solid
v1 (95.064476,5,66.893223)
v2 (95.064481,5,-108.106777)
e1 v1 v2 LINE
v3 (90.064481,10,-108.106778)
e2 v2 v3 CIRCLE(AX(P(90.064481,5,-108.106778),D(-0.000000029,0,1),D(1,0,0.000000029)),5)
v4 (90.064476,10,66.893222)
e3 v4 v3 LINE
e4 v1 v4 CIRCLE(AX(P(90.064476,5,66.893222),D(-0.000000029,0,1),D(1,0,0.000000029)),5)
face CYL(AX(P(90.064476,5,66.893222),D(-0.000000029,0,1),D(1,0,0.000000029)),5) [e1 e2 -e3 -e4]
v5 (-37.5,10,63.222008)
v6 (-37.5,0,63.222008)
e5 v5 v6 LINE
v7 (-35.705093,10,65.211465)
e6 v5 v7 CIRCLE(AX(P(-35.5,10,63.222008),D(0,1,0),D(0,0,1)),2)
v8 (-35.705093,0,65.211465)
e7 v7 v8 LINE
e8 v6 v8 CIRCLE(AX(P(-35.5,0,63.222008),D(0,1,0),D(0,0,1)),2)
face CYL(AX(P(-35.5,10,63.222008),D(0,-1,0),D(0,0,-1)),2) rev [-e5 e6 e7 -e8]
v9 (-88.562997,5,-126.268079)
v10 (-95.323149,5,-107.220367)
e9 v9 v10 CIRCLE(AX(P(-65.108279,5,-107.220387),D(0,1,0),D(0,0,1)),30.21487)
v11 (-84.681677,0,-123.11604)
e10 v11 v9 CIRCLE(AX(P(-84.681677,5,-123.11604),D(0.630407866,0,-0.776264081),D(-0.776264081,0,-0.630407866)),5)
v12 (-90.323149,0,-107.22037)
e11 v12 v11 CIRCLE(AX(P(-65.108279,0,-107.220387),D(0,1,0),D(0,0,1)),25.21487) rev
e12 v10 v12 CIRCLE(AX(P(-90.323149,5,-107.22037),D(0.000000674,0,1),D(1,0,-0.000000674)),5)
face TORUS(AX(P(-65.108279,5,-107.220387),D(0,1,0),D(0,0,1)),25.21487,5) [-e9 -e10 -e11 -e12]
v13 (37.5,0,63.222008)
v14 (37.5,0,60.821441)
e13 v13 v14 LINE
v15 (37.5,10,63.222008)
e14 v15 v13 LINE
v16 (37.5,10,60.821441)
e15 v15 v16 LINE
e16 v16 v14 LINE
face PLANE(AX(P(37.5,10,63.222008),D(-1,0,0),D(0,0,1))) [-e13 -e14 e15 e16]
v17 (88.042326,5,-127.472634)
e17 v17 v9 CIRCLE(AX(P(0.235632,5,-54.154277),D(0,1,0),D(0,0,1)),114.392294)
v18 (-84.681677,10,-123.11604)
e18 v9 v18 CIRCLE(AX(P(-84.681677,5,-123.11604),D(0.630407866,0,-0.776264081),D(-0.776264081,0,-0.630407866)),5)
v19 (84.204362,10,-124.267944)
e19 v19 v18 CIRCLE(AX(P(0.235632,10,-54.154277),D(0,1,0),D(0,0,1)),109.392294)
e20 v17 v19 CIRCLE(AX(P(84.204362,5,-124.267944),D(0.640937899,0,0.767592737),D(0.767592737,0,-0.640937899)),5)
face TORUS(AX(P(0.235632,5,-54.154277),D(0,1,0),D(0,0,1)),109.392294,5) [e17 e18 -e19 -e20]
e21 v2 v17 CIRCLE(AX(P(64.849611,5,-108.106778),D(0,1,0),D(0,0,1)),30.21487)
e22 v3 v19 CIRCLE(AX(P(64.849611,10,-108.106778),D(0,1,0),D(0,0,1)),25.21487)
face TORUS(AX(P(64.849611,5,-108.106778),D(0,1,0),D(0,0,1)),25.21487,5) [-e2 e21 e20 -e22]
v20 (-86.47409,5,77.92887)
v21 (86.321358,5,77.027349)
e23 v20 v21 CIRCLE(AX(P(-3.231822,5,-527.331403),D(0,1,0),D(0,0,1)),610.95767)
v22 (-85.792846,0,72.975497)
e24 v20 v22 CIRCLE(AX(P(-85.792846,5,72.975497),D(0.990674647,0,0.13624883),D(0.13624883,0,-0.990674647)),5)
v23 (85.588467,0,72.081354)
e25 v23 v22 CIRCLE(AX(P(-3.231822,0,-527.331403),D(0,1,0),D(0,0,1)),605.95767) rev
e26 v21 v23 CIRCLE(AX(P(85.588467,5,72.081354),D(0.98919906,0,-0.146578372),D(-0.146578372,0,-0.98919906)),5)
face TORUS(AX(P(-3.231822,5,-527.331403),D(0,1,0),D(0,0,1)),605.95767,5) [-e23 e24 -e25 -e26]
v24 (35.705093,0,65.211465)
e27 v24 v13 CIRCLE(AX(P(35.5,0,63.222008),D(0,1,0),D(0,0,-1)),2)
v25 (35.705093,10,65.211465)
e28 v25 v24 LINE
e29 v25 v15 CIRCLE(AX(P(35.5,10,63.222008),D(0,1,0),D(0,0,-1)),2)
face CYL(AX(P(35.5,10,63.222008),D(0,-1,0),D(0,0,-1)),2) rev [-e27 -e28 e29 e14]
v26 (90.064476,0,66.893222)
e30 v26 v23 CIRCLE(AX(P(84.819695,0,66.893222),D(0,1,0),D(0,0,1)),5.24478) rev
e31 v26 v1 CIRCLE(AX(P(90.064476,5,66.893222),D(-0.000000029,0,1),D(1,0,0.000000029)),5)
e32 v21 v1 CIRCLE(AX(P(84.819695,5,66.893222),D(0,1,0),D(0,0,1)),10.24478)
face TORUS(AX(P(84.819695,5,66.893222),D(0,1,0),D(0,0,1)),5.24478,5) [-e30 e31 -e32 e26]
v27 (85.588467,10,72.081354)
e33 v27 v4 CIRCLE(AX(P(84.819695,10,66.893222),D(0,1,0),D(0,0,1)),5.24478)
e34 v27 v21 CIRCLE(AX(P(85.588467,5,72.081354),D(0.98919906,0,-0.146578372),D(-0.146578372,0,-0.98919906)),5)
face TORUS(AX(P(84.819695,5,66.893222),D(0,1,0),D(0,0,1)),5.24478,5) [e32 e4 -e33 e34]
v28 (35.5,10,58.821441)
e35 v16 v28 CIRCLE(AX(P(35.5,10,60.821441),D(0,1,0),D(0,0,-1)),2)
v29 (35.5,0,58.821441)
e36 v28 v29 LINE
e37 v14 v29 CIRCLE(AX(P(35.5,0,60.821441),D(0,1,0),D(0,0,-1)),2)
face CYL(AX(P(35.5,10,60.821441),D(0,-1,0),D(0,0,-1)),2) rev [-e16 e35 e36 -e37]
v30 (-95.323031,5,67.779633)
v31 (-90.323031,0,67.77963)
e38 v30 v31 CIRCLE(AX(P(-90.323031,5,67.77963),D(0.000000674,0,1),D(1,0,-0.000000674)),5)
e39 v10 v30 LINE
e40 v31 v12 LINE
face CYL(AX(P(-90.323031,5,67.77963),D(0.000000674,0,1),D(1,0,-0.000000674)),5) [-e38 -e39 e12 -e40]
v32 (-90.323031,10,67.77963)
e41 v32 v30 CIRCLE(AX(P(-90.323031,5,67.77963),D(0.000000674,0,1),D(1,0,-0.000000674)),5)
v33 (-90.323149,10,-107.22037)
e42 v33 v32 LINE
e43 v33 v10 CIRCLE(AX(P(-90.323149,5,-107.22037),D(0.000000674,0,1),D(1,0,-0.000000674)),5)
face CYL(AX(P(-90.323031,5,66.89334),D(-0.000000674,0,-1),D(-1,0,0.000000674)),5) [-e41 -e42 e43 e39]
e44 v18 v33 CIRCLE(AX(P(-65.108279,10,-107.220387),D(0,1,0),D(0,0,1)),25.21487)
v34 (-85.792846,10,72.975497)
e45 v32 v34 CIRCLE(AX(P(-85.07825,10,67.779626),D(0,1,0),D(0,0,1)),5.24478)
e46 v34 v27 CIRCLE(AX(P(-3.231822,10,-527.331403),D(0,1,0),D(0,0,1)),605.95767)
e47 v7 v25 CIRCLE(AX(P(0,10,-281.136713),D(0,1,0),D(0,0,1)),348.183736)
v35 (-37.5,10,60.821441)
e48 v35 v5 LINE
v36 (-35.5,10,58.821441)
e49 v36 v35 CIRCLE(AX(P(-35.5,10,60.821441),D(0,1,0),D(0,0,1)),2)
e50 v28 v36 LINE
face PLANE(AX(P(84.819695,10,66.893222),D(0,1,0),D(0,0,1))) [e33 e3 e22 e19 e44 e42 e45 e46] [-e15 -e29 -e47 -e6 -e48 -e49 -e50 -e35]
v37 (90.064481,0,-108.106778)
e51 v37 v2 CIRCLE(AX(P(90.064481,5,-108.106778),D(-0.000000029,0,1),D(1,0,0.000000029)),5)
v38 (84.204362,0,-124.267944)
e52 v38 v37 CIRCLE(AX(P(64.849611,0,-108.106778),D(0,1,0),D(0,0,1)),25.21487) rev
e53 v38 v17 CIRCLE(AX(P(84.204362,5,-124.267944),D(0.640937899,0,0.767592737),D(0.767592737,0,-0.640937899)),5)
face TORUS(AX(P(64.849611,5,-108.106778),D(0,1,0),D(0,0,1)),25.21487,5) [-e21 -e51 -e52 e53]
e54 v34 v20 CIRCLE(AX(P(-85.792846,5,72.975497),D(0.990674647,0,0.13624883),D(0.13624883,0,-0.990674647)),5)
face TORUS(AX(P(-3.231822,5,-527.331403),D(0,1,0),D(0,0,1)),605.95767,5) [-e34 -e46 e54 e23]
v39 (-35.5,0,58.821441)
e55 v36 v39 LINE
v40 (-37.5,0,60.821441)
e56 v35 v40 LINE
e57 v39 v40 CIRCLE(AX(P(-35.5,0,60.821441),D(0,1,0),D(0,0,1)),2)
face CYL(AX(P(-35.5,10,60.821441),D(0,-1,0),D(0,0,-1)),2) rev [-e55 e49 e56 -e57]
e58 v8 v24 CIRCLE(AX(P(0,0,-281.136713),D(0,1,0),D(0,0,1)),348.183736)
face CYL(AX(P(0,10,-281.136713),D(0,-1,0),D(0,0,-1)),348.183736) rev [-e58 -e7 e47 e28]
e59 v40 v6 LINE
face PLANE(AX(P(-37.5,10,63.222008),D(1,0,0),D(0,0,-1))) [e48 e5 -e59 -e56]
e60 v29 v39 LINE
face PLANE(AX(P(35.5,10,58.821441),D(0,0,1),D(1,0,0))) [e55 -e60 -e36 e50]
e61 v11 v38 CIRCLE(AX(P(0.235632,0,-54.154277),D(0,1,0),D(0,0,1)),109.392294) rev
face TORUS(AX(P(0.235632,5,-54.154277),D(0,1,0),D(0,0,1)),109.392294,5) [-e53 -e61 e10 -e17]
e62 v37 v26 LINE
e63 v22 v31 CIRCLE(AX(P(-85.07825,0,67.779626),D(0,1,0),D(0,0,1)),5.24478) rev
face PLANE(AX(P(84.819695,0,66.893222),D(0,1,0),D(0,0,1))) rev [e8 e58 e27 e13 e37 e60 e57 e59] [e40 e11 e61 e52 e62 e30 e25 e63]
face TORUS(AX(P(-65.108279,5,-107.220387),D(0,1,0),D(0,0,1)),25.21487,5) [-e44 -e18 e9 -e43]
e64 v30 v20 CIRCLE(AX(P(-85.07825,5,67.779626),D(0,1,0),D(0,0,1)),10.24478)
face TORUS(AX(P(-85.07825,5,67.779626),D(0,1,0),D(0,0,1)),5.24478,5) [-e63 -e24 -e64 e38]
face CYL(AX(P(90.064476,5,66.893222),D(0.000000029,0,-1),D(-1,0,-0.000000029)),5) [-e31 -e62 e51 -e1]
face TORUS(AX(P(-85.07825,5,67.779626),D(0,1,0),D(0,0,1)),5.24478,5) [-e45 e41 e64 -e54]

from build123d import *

# Parameters (mm, degrees)
BOSS_EXTRUDE1_DEPTH = 10
FILLET1_R           = 5


with BuildPart() as part:
    # Sketch1 → Boss-Extrude1 (new body)
    with BuildSketch(Plane(origin=(0, 0, 0), x_dir=(1, 0, 0), z_dir=(0, 1, 0))):
        with BuildLine():
            Line((95.064475679, -66.893222563), (95.064480767, 108.106777437))
            ThreePointArc((95.064480767, 108.106777437), (93.254744528, 118.406620299), (88.04232554, 127.472633565))
            ThreePointArc((88.04232554, 127.472633565), (-0.544574451, 168.543910176), (-88.562996968, 126.268078898))
            ThreePointArc((-88.562996968, 126.268078898), (-93.583004489, 117.32624486), (-95.323148669, 107.220366882))
            Line((-95.323148669, 107.220366882), (-95.323030776, -67.779633118))
            ThreePointArc((-95.323030776, -67.779633118), (-92.800151785, -74.512215926), (-86.474089698, -77.92887045))
            ThreePointArc((-86.474089698, -77.92887045), (-0.044332377, -83.617951425), (86.321358486, -77.027349436))
            ThreePointArc((86.321358486, -77.027349436), (92.576619033, -73.585431127), (95.064475679, -66.893222563))
        make_face()
        with BuildLine():
            Line((35.5, -58.821440939), (-35.5, -58.821440939))
            ThreePointArc((-35.5, -58.821440939), (-36.914213562, -59.407227376), (-37.5, -60.821440939))
            Line((-37.5, -60.821440939), (-37.5, -63.222008463))
            ThreePointArc((-37.5, -63.222008463), (-36.98495569, -64.561749706), (-35.705093402, -65.211464845))
            ThreePointArc((-35.705093402, -65.211464845), (0, -67.047022968), (35.705093402, -65.211464845))
            ThreePointArc((35.705093402, -65.211464845), (36.98495569, -64.561749706), (37.5, -63.222008463))
            Line((37.5, -63.222008463), (37.5, -60.821440939))
            ThreePointArc((37.5, -60.821440939), (36.914213562, -59.407227376), (35.5, -58.821440939))
        make_face(mode=Mode.SUBTRACT)
    extrude(amount=BOSS_EXTRUDE1_DEPTH)

    # Fillet1
    fillet1_edges = [part.edges().sort_by_distance(p)[0] for p in [
        (92.576619033, 10, 73.585431127),
        (-0.044332377, 10, 83.617951425),
        (-92.800151785, 10, 74.512215926),
        (-95.323089722, 10, -19.720366882),
        (-93.583004489, 10, -117.32624486),
        (-0.544574451, 10, -168.543910176),
        (93.254744528, 10, -118.406620299),
        (92.576619033, 0, 73.585431127),
        (-0.044332377, 0, 83.617951425),
        (-92.800151785, 0, 74.512215926),
        (-95.323089722, 0, -19.720366882),
        (-93.583004489, 0, -117.32624486),
        (-0.544574451, 0, -168.543910176),
        (93.254744528, 0, -118.406620299),
        (95.064478223, 10, -20.606777437),
        (95.064478223, 0, -20.606777437),
    ]]
    fillet(fillet1_edges, radius=FILLET1_R - 0.0001)  # a hair under: the kernel refuses the full size


solid = part.part
